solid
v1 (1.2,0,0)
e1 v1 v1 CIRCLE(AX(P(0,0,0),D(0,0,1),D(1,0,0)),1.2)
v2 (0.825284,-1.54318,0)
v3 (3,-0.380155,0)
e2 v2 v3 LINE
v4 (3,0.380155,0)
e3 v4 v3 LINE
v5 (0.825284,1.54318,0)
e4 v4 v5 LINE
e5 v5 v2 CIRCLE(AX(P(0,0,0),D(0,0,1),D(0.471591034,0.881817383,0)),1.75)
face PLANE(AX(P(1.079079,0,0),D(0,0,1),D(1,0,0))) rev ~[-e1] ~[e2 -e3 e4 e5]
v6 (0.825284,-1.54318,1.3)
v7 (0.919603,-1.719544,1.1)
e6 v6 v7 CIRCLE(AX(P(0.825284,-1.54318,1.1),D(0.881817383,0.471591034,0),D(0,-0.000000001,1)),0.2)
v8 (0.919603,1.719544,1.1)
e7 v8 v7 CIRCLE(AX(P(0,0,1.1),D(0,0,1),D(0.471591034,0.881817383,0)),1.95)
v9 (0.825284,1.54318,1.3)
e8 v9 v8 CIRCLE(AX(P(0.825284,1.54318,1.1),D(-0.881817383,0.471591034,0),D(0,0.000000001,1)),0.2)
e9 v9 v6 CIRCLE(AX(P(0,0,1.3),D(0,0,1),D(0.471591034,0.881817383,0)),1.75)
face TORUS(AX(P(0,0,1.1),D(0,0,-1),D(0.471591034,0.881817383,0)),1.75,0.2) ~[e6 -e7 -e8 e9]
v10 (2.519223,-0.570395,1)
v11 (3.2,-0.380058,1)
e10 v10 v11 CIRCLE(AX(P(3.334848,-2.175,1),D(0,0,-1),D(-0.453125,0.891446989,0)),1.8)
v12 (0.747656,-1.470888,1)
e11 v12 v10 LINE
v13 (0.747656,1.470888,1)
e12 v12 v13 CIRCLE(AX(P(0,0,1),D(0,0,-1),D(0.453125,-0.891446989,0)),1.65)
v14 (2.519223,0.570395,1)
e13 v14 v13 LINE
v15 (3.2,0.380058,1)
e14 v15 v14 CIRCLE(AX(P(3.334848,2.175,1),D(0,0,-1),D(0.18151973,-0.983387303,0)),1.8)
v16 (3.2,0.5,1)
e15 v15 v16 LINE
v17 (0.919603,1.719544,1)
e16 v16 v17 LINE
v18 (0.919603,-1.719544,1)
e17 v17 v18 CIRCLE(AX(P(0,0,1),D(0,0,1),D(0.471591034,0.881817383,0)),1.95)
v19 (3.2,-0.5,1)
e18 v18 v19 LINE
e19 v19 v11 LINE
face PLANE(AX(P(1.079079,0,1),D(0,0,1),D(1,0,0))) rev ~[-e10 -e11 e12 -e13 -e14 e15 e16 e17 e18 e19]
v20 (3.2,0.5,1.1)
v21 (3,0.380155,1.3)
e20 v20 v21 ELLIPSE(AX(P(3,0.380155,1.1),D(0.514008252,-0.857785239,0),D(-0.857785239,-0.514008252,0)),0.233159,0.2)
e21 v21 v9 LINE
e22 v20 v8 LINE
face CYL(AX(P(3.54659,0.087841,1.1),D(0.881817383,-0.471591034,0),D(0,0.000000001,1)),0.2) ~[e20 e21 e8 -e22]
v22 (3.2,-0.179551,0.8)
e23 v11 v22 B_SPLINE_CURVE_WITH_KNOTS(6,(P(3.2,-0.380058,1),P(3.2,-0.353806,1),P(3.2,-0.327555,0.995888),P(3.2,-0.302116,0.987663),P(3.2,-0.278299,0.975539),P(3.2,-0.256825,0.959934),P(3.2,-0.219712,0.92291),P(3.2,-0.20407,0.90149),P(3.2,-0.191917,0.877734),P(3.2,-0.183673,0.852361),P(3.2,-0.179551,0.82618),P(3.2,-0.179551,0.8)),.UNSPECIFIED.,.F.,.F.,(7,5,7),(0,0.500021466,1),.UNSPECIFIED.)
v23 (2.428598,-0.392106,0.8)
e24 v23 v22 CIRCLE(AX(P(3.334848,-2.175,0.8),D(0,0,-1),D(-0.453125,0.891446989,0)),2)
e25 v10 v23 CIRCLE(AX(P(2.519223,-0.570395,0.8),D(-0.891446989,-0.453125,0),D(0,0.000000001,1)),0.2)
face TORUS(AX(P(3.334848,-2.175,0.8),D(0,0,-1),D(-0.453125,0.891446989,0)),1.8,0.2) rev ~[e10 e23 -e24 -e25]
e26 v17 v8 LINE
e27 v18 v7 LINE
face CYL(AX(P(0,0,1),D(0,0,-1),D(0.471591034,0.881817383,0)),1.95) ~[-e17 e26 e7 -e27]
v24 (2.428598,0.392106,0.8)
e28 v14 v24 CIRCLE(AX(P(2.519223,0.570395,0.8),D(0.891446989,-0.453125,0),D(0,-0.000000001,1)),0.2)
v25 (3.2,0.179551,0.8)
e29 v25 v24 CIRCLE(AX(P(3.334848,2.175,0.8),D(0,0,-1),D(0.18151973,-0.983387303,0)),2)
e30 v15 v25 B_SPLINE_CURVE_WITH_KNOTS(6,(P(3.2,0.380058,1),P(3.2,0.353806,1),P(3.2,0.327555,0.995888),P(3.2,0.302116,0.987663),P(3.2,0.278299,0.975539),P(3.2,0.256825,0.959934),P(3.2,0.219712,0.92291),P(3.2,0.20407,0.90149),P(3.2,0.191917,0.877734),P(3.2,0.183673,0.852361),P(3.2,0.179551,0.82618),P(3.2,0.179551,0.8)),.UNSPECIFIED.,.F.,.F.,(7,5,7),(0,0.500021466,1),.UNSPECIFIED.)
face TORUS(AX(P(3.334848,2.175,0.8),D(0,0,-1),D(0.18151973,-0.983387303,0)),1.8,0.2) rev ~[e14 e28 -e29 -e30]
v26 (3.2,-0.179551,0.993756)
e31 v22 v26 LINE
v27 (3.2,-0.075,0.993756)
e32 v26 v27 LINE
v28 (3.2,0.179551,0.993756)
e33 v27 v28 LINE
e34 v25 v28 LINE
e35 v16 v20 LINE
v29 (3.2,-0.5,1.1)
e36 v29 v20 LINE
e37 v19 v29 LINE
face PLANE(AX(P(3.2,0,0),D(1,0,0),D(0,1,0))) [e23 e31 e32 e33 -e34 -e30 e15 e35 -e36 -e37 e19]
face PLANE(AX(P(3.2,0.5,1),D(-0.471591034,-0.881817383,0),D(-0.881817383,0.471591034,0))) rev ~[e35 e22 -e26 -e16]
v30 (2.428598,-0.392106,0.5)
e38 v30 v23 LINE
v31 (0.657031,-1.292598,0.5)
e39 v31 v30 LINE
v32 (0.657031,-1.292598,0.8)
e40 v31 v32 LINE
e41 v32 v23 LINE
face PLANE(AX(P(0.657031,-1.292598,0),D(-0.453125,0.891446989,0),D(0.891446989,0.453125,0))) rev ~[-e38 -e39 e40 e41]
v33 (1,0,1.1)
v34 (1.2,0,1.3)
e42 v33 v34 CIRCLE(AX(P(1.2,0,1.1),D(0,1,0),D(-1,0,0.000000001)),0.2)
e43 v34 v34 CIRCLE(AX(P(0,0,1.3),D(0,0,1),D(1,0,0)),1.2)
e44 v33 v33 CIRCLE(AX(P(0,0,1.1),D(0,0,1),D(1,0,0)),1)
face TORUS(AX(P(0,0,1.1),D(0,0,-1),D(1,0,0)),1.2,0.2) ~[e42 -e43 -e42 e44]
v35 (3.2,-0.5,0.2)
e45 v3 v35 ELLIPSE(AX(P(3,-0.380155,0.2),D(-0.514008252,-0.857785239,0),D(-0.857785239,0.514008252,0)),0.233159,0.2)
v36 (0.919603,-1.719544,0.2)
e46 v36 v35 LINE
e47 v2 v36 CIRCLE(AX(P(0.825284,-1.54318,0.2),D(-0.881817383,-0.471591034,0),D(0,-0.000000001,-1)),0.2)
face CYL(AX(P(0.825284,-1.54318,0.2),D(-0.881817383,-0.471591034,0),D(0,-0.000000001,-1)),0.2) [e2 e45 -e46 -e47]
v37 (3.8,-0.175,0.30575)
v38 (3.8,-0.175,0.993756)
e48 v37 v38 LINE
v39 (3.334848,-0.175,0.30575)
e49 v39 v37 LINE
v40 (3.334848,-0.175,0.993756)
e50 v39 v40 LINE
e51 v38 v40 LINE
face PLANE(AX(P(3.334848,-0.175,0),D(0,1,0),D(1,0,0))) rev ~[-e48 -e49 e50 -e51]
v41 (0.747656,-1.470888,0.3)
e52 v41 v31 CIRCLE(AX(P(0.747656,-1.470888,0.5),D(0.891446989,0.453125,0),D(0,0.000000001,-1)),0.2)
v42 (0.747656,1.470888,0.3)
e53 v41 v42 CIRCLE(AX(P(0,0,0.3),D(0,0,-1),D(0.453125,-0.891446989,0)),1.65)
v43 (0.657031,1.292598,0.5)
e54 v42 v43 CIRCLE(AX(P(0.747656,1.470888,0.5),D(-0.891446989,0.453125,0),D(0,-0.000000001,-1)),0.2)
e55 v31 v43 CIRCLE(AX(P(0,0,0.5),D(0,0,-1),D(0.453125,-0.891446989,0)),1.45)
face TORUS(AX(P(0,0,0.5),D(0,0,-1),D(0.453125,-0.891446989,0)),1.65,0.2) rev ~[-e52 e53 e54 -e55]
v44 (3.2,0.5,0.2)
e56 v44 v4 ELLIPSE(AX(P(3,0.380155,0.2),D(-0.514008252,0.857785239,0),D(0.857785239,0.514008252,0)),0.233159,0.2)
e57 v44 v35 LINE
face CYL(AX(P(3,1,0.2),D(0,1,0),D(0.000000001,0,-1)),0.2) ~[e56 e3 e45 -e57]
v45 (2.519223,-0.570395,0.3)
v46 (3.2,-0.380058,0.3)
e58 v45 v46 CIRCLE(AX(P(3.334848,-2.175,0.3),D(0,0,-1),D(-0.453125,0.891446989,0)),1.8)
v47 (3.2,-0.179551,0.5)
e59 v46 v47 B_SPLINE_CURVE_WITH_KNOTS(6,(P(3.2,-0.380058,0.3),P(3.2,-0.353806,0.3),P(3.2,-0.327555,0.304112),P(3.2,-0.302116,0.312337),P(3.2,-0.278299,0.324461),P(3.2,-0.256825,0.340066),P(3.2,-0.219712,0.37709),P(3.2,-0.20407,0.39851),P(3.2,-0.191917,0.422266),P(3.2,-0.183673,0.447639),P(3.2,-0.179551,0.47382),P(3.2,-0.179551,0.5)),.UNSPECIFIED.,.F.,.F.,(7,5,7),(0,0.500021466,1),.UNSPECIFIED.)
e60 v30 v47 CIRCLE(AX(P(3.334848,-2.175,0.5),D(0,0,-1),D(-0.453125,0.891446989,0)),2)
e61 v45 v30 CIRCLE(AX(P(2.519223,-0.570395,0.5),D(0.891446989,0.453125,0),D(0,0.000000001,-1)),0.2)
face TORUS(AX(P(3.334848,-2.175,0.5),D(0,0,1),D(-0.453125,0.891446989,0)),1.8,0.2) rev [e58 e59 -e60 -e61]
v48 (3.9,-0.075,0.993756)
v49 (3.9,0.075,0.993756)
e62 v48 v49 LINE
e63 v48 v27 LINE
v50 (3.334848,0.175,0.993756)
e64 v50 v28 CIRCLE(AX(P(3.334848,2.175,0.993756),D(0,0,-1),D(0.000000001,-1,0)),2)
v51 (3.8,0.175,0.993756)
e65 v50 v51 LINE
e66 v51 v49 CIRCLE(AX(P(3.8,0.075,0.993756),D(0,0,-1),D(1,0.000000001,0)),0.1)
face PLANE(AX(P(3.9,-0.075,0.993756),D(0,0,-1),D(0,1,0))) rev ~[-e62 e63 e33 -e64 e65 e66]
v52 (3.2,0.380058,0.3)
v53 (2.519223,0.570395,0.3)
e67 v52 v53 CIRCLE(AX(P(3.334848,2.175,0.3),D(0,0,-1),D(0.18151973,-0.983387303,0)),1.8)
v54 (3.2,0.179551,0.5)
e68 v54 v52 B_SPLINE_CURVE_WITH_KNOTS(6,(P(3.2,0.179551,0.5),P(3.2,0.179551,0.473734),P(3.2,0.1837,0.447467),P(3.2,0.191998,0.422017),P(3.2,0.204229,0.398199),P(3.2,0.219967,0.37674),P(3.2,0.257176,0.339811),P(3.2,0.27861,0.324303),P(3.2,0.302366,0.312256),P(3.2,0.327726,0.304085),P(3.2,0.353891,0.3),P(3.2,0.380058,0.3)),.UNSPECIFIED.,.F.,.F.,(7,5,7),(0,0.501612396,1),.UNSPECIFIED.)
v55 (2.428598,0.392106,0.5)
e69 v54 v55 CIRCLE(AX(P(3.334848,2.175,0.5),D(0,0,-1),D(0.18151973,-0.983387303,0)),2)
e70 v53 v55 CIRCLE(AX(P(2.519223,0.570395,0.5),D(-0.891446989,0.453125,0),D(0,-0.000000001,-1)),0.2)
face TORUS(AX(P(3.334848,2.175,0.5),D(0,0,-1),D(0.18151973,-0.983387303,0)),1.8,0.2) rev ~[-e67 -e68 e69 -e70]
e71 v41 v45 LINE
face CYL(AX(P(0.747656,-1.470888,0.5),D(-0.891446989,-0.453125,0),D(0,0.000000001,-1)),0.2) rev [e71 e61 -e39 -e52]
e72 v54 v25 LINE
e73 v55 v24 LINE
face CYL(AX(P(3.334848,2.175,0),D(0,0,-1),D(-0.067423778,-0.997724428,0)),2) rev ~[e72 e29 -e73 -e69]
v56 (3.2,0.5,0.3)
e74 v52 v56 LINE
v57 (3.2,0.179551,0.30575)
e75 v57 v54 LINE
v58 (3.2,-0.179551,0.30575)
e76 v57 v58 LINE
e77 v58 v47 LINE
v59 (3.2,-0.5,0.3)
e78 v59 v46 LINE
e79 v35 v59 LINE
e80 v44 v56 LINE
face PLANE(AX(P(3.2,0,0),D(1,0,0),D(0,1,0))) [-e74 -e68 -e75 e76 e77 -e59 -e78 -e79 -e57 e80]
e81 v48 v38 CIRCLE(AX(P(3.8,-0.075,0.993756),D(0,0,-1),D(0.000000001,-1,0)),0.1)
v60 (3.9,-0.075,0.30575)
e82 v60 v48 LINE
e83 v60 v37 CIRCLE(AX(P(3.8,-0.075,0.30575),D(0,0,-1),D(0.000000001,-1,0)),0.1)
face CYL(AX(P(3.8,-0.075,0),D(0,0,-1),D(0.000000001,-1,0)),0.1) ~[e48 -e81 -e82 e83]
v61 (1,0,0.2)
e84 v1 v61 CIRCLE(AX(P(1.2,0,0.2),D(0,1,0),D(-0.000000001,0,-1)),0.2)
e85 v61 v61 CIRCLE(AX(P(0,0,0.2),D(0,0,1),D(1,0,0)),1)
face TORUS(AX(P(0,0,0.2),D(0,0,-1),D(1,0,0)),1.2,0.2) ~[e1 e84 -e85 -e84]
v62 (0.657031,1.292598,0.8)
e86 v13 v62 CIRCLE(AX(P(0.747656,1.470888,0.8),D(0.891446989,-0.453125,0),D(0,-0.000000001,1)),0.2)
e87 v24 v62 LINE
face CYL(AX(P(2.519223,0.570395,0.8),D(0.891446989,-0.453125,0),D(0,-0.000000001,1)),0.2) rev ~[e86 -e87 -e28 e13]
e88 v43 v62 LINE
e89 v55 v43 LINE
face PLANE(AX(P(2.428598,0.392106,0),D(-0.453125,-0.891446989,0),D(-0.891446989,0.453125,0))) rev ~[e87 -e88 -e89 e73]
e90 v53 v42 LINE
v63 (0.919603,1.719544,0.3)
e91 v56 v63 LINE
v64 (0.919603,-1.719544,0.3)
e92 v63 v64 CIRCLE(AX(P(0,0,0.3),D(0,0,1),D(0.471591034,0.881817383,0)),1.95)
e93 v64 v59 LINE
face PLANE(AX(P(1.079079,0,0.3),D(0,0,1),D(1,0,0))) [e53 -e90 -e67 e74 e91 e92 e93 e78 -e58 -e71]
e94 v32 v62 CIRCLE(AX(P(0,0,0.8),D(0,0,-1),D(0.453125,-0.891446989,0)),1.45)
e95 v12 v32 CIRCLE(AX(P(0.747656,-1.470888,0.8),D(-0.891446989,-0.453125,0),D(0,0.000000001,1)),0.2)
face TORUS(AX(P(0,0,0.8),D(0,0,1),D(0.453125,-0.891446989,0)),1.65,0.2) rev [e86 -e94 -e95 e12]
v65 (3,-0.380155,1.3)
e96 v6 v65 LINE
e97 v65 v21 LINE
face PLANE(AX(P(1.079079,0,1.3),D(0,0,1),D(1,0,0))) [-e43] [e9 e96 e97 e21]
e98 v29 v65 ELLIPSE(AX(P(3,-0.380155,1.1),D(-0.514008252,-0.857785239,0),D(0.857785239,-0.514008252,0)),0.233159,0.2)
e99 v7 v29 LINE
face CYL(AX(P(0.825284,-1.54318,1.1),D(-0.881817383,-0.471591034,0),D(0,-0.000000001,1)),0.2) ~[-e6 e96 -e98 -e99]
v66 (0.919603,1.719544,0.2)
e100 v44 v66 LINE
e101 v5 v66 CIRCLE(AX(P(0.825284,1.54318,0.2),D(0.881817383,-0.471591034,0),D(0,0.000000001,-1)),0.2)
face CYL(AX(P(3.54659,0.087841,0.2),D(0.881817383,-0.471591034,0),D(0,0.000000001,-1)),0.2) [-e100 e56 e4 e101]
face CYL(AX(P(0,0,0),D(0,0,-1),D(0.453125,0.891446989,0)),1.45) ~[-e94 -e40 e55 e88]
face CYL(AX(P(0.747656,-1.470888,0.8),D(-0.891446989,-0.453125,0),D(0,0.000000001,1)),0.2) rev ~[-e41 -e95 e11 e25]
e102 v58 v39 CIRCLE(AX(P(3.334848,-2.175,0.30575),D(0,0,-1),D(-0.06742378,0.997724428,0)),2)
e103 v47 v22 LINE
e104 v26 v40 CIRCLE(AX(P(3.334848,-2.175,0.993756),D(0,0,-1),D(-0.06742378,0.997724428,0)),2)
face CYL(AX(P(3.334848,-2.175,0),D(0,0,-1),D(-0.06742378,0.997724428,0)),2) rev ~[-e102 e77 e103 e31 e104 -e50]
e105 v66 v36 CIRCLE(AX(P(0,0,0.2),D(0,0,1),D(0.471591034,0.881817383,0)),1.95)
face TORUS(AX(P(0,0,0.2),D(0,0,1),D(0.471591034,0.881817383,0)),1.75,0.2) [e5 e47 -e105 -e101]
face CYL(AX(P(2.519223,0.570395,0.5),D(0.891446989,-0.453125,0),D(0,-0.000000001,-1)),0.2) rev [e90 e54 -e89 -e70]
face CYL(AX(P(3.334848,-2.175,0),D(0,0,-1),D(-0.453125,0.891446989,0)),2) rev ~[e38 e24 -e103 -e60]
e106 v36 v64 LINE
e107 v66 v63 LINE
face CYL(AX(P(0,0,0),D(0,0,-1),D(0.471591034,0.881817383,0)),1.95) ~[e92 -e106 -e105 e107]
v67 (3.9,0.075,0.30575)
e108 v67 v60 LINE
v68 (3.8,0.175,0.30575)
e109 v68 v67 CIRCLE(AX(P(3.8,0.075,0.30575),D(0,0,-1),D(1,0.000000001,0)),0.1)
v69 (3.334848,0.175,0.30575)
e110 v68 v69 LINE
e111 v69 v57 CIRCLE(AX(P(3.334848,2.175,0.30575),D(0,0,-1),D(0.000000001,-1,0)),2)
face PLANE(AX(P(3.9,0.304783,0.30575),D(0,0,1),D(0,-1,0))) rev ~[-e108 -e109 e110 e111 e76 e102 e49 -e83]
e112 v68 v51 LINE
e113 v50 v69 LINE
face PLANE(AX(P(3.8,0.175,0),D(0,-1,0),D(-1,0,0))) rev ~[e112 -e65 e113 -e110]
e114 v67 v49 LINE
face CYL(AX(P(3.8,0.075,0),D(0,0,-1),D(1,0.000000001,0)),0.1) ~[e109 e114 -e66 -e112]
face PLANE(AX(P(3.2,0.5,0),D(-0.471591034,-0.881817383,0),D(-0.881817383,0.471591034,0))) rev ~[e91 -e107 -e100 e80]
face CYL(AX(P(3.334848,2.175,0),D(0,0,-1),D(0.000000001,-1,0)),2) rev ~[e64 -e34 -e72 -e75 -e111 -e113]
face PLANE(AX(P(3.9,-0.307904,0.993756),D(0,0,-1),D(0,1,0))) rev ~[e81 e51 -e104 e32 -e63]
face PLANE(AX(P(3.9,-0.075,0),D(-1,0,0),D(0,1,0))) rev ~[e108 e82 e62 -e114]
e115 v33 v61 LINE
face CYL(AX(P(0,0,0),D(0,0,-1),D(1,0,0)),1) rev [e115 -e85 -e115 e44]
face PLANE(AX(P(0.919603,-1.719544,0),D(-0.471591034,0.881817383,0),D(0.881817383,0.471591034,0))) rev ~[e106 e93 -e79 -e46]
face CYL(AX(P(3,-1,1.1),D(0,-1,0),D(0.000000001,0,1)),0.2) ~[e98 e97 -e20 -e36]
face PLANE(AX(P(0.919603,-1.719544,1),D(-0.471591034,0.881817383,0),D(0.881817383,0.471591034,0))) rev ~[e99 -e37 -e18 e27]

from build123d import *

# Parameters (mm, degrees)
F0_R          = 1
F1_DEPTH      = 1.3
F2_DEPTH      = 0.3
F3_START      = 1
F3_DEPTH      = 0.3
F4_W          = 0.15
F4_H          = 0.3062440047
F4_W_2        = 0.2115944407
F4_W_3        = 0.2297833452
F4_H_2        = 0.3057500289
F4_W_4        = 0.2163899079
F5_DEPTH      = 0.7
F6_T1_DEPTH   = 1.9872929377
F6_T3_DEPTH   = 1.9872929377
F6_T6_ANGLE   = 233.888716361
F6_T10_ANGLE  = 37.4026504782
F6_T15_ANGLE  = 37.4026504782
F6_T18_ANGLE  = 233.888716361
F6_T22_ANGLE  = 37.4026504782
F6_T27_ANGLE  = 37.4026504782
F6_T32_DEPTH  = 2
F6_T38_DEPTH  = 3.0860201082
F6_T41_ANGLE  = 236.2752472868
F6_T45_DEPTH  = 3.0860201082
F6_T52_DEPTH  = 3.0860201082
F6_T57_DEPTH  = 2
F6_T63_DEPTH  = 3.0860201082
F6_T66_ANGLE  = 236.2752472868
F6_T73_DEPTH  = 2
F6_T77_DEPTH  = 3.0860201082
F6_T84_DEPTH  = 2
F6_T88_DEPTH  = 3.0860201082
F6_T95_DEPTH  = 3.0860201082
F6_T99_DEPTH  = 2
F6_T106_DEPTH = 2
F6_T110_DEPTH = 3.0860201082


# Not quite as in the source:
# - a fillet or chamfer that OpenCascade refuses, or shapes differently, is made with other operations: its cross-section is extruded or revolved along the edge and cut away or added


with BuildPart() as f1:
    # F0 (on Top) → F1 (new body)
    with BuildSketch(Plane.XY):
        with BuildLine():
            ThreePointArc((2.4285975558, -0.3921060218), (2.8035605108, -0.2468573508), (3.2, -0.1795511441))
            ThreePointArc((3.2, -0.1795511441), (3.2673853882, -0.1761381098), (3.3348475558, -0.175))
            Line((3.3348475558, -0.175), (3.8, -0.175))
            ThreePointArc((3.8, -0.175), (3.8707106781, -0.1457106781), (3.9, -0.075))
            Line((3.9, -0.075), (3.9, 0))
            Line((3.9, 0), (3.9, 0.075))
            ThreePointArc((3.9, 0.075), (3.8707106781, 0.1457106781), (3.8, 0.175))
            Line((3.8, 0.175), (3.3348475558, 0.175))
            ThreePointArc((3.3348475558, 0.175), (3.2673853882, 0.1761381098), (3.2, 0.1795511441))
            ThreePointArc((3.2, 0.1795511441), (2.8035605108, 0.2468573508), (2.4285975558, 0.3921060218))
            Line((2.4285975558, 0.3921060218), (0.65703125, 1.2925981342))
            ThreePointArc((0.65703125, 1.2925981342), (-1.45, 0), (0.65703125, -1.2925981342))
            Line((0.65703125, -1.2925981342), (2.4285975558, -0.3921060218))
        make_face()
        Circle(F0_R, mode=Mode.SUBTRACT)
    extrude(amount=F1_DEPTH)

    # F0 (on Top) → F2 (join)
    with BuildSketch(Plane.XY):
        with BuildLine():
            ThreePointArc((2.4285975558, -0.3921060218), (2.8035605108, -0.2468573508), (3.2, -0.1795511441))
            ThreePointArc((3.2, -0.1795511441), (3.2673853882, -0.1761381098), (3.3348475558, -0.175))
            Line((3.3348475558, -0.175), (3.8, -0.175))
            ThreePointArc((3.8, -0.175), (3.8707106781, -0.1457106781), (3.9, -0.075))
            Line((3.9, -0.075), (3.9, 0))
            Line((3.9, 0), (3.9, 0.075))
            ThreePointArc((3.9, 0.075), (3.8707106781, 0.1457106781), (3.8, 0.175))
            Line((3.8, 0.175), (3.3348475558, 0.175))
            ThreePointArc((3.3348475558, 0.175), (3.2673853882, 0.1761381098), (3.2, 0.1795511441))
            ThreePointArc((3.2, 0.1795511441), (2.8035605108, 0.2468573508), (2.4285975558, 0.3921060218))
            Line((2.4285975558, 0.3921060218), (0.65703125, 1.2925981342))
            ThreePointArc((0.65703125, 1.2925981342), (-1.45, 0), (0.65703125, -1.2925981342))
            Line((0.65703125, -1.2925981342), (2.4285975558, -0.3921060218))
        make_face()
        Circle(F0_R, mode=Mode.SUBTRACT)
        with BuildLine():
            Line((3.2, -0.5), (3.2, -0.1795511441))
            ThreePointArc((3.2, -0.1795511441), (2.8035605108, -0.2468573508), (2.4285975558, -0.3921060218))
            Line((2.4285975558, -0.3921060218), (0.65703125, -1.2925981342))
            ThreePointArc((0.65703125, -1.2925981342), (-1.45, 0), (0.65703125, 1.2925981342))
            Line((0.65703125, 1.2925981342), (2.4285975558, 0.3921060218))
            ThreePointArc((2.4285975558, 0.3921060218), (2.8035605108, 0.2468573508), (3.2, 0.1795511441))
            Line((3.2, 0.1795511441), (3.2, 0.5))
            Line((3.2, 0.5), (0.9196025162, 1.7195438966))
            ThreePointArc((0.9196025162, 1.7195438966), (-1.95, 0), (0.9196025162, -1.7195438966))
            Line((0.9196025162, -1.7195438966), (3.2, -0.5))
        make_face()
    extrude(amount=F2_DEPTH)

    # F0 (on Top) → F3 (join)
    with BuildSketch(Plane.XY.offset(F3_START)):
        with BuildLine():
            ThreePointArc((2.4285975558, -0.3921060218), (2.8035605108, -0.2468573508), (3.2, -0.1795511441))
            ThreePointArc((3.2, -0.1795511441), (3.2673853882, -0.1761381098), (3.3348475558, -0.175))
            Line((3.3348475558, -0.175), (3.8, -0.175))
            ThreePointArc((3.8, -0.175), (3.8707106781, -0.1457106781), (3.9, -0.075))
            Line((3.9, -0.075), (3.9, 0))
            Line((3.9, 0), (3.9, 0.075))
            ThreePointArc((3.9, 0.075), (3.8707106781, 0.1457106781), (3.8, 0.175))
            Line((3.8, 0.175), (3.3348475558, 0.175))
            ThreePointArc((3.3348475558, 0.175), (3.2673853882, 0.1761381098), (3.2, 0.1795511441))
            ThreePointArc((3.2, 0.1795511441), (2.8035605108, 0.2468573508), (2.4285975558, 0.3921060218))
            Line((2.4285975558, 0.3921060218), (0.65703125, 1.2925981342))
            ThreePointArc((0.65703125, 1.2925981342), (-1.45, 0), (0.65703125, -1.2925981342))
            Line((0.65703125, -1.2925981342), (2.4285975558, -0.3921060218))
        make_face()
        Circle(F0_R, mode=Mode.SUBTRACT)
        with BuildLine():
            Line((3.2, -0.5), (3.2, -0.1795511441))
            ThreePointArc((3.2, -0.1795511441), (2.8035605108, -0.2468573508), (2.4285975558, -0.3921060218))
            Line((2.4285975558, -0.3921060218), (0.65703125, -1.2925981342))
            ThreePointArc((0.65703125, -1.2925981342), (-1.45, 0), (0.65703125, 1.2925981342))
            Line((0.65703125, 1.2925981342), (2.4285975558, 0.3921060218))
            ThreePointArc((2.4285975558, 0.3921060218), (2.8035605108, 0.2468573508), (3.2, 0.1795511441))
            Line((3.2, 0.1795511441), (3.2, 0.5))
            Line((3.2, 0.5), (0.9196025162, 1.7195438966))
            ThreePointArc((0.9196025162, 1.7195438966), (-1.95, 0), (0.9196025162, -1.7195438966))
            Line((0.9196025162, -1.7195438966), (3.2, -0.5))
        make_face()
    extrude(amount=F3_DEPTH)

    # F4 (on face) → F5 (cut)
    with BuildSketch(Plane.YZ.offset(3.9)):
        Polygon((-0.075, 1.3), (-0.2913899079, 1.3), (-0.3079036542, 0.9937559953), (-0.075, 0.9937559953), align=None)
        with Locations((0, 1.1468779976)):
            Rectangle(F4_W, F4_H)
        with Locations((0.1807972203, 1.1468779976)):
            Rectangle(F4_W_2, F4_H)
        with Locations((0.1898916726, 0.1528750145)):
            Rectangle(F4_W_3, F4_H_2)
        with Locations((0, 0.1528750145)):
            Rectangle(F4_W, F4_H_2)
        with Locations((-0.183194954, 0.1528750145)):
            Rectangle(F4_W_4, F4_H_2)
    extrude(amount=-F5_DEPTH, mode=Mode.SUBTRACT)

    # F6: fillet of radius 0.2 on 14 edges, made by hand

    # F6_s2 → F6_t1 (join)
    with BuildSketch(Plane(origin=(0, 0, 0), x_dir=(0, 0, 1), z_dir=(0.8914469891, 0.453125, 0))):
        with BuildLine():
            ThreePointArc((0.3, 1.65), (0.3585786438, 1.5085786438), (0.5, 1.45))
            Line((0.5, 1.45), (0.5, 1.446))
            Line((0.5, 1.446), (0.296, 1.446))
            Line((0.296, 1.446), (0.296, 1.65))
            Line((0.296, 1.65), (0.3, 1.65))
        make_face()
        with BuildLine():
            ThreePointArc((1, 1.65), (0.9414213562, 1.5085786438), (0.8, 1.45))
            Line((0.8, 1.45), (0.8, 1.446))
            Line((0.8, 1.446), (1.004, 1.446))
            Line((1.004, 1.446), (1.004, 1.65))
            Line((1.004, 1.65), (1, 1.65))
        make_face()
    extrude(amount=F6_T1_DEPTH)

    # F6_s4 → F6_t3 (join)
    with BuildSketch(Plane(origin=(1.7715663058, -0.9004921124, 0), x_dir=(0, 0, 1), z_dir=(-0.8914469891, 0.453125, 0))):
        with BuildLine():
            ThreePointArc((1, 1.65), (0.9414213562, 1.5085786438), (0.8, 1.45))
            Line((0.8, 1.45), (0.8, 1.446))
            Line((0.8, 1.446), (1.004, 1.446))
            Line((1.004, 1.446), (1.004, 1.65))
            Line((1.004, 1.65), (1, 1.65))
        make_face()
        with BuildLine():
            ThreePointArc((0.3, 1.65), (0.3585786438, 1.5085786438), (0.5, 1.45))
            Line((0.5, 1.45), (0.5, 1.446))
            Line((0.5, 1.446), (0.296, 1.446))
            Line((0.296, 1.446), (0.296, 1.65))
            Line((0.296, 1.65), (0.3, 1.65))
        make_face()
    extrude(amount=F6_T3_DEPTH)

    # F6_s5 → F6_t6 (revolve)
    with BuildSketch(Plane(origin=(0, 0, 0), x_dir=(0, 0, 1), z_dir=(0.8914469891, 0.453125, 0))):
        with BuildLine():
            ThreePointArc((1, 1.65), (0.9414213562, 1.5085786438), (0.8, 1.45))
            Line((0.8, 1.45), (0.8, 1.446))
            Line((0.8, 1.446), (1.004, 1.446))
            Line((1.004, 1.446), (1.004, 1.65))
            Line((1.004, 1.65), (1, 1.65))
        make_face()
    revolve(axis=Axis((0, 0, 1), (0, 0, -1)), revolution_arc=F6_T6_ANGLE)


with BuildPart() as f6_tool8:
    # F6_s9 → F6_t10 (revolve)
    with BuildSketch(Plane(origin=(1.7715663058, 0.9004921124, 0), x_dir=(0, 0, 1), z_dir=(-0.8914469891, -0.453125, 0))):
        with BuildLine():
            ThreePointArc((1, -1.65), (0.9414213562, -1.5085786438), (0.8, -1.45))
            Line((0.8, -1.45), (0.8, -1.446))
            Line((0.8, -1.446), (1.004, -1.446))
            Line((1.004, -1.446), (1.004, -1.65))
            Line((1.004, -1.65), (1, -1.65))
        make_face()
    revolve(axis=Axis((3.3348475558, -2.175, 1), (0, 0, -1)), revolution_arc=F6_T10_ANGLE)

    split(bisect_by=Plane.YZ.offset(3.2), keep=Keep.BOTTOM)


with BuildPart() as f1_1:
    add(f1.part)

    # F6_t7: union F6_tool8
    add(f6_tool8.part)


with BuildPart() as f6_tool13:
    # F6_s14 → F6_t15 (revolve)
    with BuildSketch(Plane(origin=(3.6132129184, 0.666949259, 0), x_dir=(0, 0, 1), z_dir=(0.983387303, 0.1815197299, 0))):
        with BuildLine():
            ThreePointArc((1, 0.2664732437), (0.9414213562, 0.4078945999), (0.8, 0.4664732437))
            Line((0.8, 0.4664732437), (0.8, 0.4704732437))
            Line((0.8, 0.4704732437), (1.004, 0.4704732437))
            Line((1.004, 0.4704732437), (1.004, 0.2664732437))
            Line((1.004, 0.2664732437), (1, 0.2664732437))
        make_face()
    revolve(axis=Axis((3.3348475558, 2.175, 1), (0, 0, -1)), revolution_arc=F6_T15_ANGLE)

    split(bisect_by=Plane.YZ.offset(3.2), keep=Keep.BOTTOM)


with BuildPart() as f1_2:
    add(f1_1.part)

    # F6_t12: union F6_tool13
    add(f6_tool13.part)

    # F6_s17 → F6_t18 (revolve)
    with BuildSketch(Plane(origin=(0, 0, 0), x_dir=(0, 0, 1), z_dir=(0.8914469891, 0.453125, 0))):
        with BuildLine():
            ThreePointArc((0.3, 1.65), (0.3585786438, 1.5085786438), (0.5, 1.45))
            Line((0.5, 1.45), (0.5, 1.446))
            Line((0.5, 1.446), (0.296, 1.446))
            Line((0.296, 1.446), (0.296, 1.65))
            Line((0.296, 1.65), (0.3, 1.65))
        make_face()
    revolve(axis=Axis((0, 0, 0.3), (0, 0, -1)), revolution_arc=F6_T18_ANGLE)


with BuildPart() as f6_tool20:
    # F6_s21 → F6_t22 (revolve)
    with BuildSketch(Plane(origin=(1.7715663058, 0.9004921124, 0), x_dir=(0, 0, 1), z_dir=(-0.8914469891, -0.453125, 0))):
        with BuildLine():
            ThreePointArc((0.3, -1.65), (0.3585786438, -1.5085786438), (0.5, -1.45))
            Line((0.5, -1.45), (0.5, -1.446))
            Line((0.5, -1.446), (0.296, -1.446))
            Line((0.296, -1.446), (0.296, -1.65))
            Line((0.296, -1.65), (0.3, -1.65))
        make_face()
    revolve(axis=Axis((3.3348475558, -2.175, 0.3), (0, 0, -1)), revolution_arc=F6_T22_ANGLE)

    split(bisect_by=Plane.YZ.offset(3.2), keep=Keep.BOTTOM)


with BuildPart() as f1_3:
    add(f1_2.part)

    # F6_t19: union F6_tool20
    add(f6_tool20.part)


with BuildPart() as f6_tool25:
    # F6_s26 → F6_t27 (revolve)
    with BuildSketch(Plane(origin=(3.6132129184, 0.666949259, 0), x_dir=(0, 0, 1), z_dir=(0.983387303, 0.1815197299, 0))):
        with BuildLine():
            ThreePointArc((0.5, 0.4664732437), (0.3585786438, 0.4078945999), (0.3, 0.2664732437))
            Line((0.3, 0.2664732437), (0.296, 0.2664732437))
            Line((0.296, 0.2664732437), (0.296, 0.4704732437))
            Line((0.296, 0.4704732437), (0.5, 0.4704732437))
            Line((0.5, 0.4704732437), (0.5, 0.4664732437))
        make_face()
    revolve(axis=Axis((3.3348475558, 2.175, 0.3), (0, 0, -1)), revolution_arc=F6_T27_ANGLE)

    split(bisect_by=Plane.YZ.offset(3.2), keep=Keep.BOTTOM)


with BuildPart() as f1_4:
    add(f1_3.part)

    # F6_t24: union F6_tool25
    add(f6_tool25.part)


with BuildPart() as f6_tool30:
    # F6_s31 → F6_t32 (new body)
    with BuildSketch(Plane.XZ.offset(1)):
        with BuildLine():
            ThreePointArc((3, 1.3), (3.1414213562, 1.2414213562), (3.2, 1.1))
            Line((3.2, 1.1), (3.204, 1.1))
            Line((3.204, 1.1), (3.204, 1.304))
            Line((3.204, 1.304), (3, 1.304))
            Line((3, 1.304), (3, 1.3))
        make_face()
    extrude(amount=-F6_T32_DEPTH)

    split(bisect_by=Plane(origin=(0.9196025162, -1.7195438966, 0), x_dir=(0, 0, 1), z_dir=(-0.4715910339, 0.8818173829, 0)), keep=Keep.TOP)

    split(bisect_by=Plane(origin=(0.9196025162, 1.7195438966, 0), x_dir=(0, 0, 1), z_dir=(-0.4715910339, -0.8818173829, 0)), keep=Keep.TOP)


with BuildPart() as f1_5:
    add(f1_4.part)

    # F6_t29: cut F6_tool30
    add(f6_tool30.part, mode=Mode.SUBTRACT)


with BuildPart() as f6_tool36:
    # F6_s37 → F6_t38 (new body)
    with BuildSketch(Plane(origin=(2.7213061753, -1.4553394135, 0), x_dir=(0, 0, 1), z_dir=(-0.8818173829, 0.4715910339, 0))):
        with BuildLine():
            ThreePointArc((1.3, 1.75), (1.2414213562, 1.8914213562), (1.1, 1.95))
            Line((1.1, 1.95), (1.1, 1.954))
            Line((1.1, 1.954), (1.304, 1.954))
            Line((1.304, 1.954), (1.304, 1.75))
            Line((1.304, 1.75), (1.3, 1.75))
        make_face()
    extrude(amount=F6_T38_DEPTH)

    split(bisect_by=Plane.YZ.offset(3.2), keep=Keep.BOTTOM)


with BuildPart() as f1_6:
    add(f1_5.part)

    # F6_t35: cut F6_tool36
    add(f6_tool36.part, mode=Mode.SUBTRACT)

    # F6_s40 → F6_t41 (revolve, cut)
    with BuildSketch(Plane(origin=(0, 0, 0), x_dir=(0, 0, 1), z_dir=(0.8818173829, -0.4715910339, 0))):
        with BuildLine():
            ThreePointArc((1.3, -1.75), (1.2414213562, -1.8914213562), (1.1, -1.95))
            Line((1.1, -1.95), (1.1, -1.954))
            Line((1.1, -1.954), (1.304, -1.954))
            Line((1.304, -1.954), (1.304, -1.75))
            Line((1.304, -1.75), (1.3, -1.75))
        make_face()
    revolve(axis=Axis((0, 0, 1.3), (0, 0, 1)), revolution_arc=F6_T41_ANGLE, mode=Mode.SUBTRACT)


with BuildPart() as f6_tool43:
    # F6_s44 → F6_t45 (new body)
    with BuildSketch(Plane(origin=(0, 0, 0), x_dir=(0, 0, 1), z_dir=(0.8818173829, 0.4715910339, 0))):
        with BuildLine():
            ThreePointArc((1.3, 1.75), (1.2414213562, 1.8914213562), (1.1, 1.95))
            Line((1.1, 1.95), (1.1, 1.954))
            Line((1.1, 1.954), (1.304, 1.954))
            Line((1.304, 1.954), (1.304, 1.75))
            Line((1.304, 1.75), (1.3, 1.75))
        make_face()
    extrude(amount=F6_T45_DEPTH)

    split(bisect_by=Plane.YZ.offset(3.2), keep=Keep.BOTTOM)


with BuildPart() as f1_7:
    add(f1_6.part)

    # F6_t42: cut F6_tool43
    add(f6_tool43.part, mode=Mode.SUBTRACT)

    # F6_s47 → F6_t48 (revolve, cut)
    with BuildSketch(Plane.XZ):
        with BuildLine():
            ThreePointArc((1, 1.1), (1.0585786438, 1.2414213562), (1.2, 1.3))
            Line((1.2, 1.3), (1.2, 1.304))
            Line((1.2, 1.304), (0.996, 1.304))
            Line((0.996, 1.304), (0.996, 1.1))
            Line((0.996, 1.1), (1, 1.1))
        make_face()
    revolve(axis=Axis((0, 0, 1.3), (0, 0, 1)), mode=Mode.SUBTRACT)


with BuildPart() as f6_tool50:
    # F6_s51 → F6_t52 (new body)
    with BuildSketch(Plane(origin=(0, 0, 0), x_dir=(0, 0, 1), z_dir=(0.8818173829, 0.4715910339, 0))):
        with BuildLine():
            ThreePointArc((0, 1.75), (0.0585786438, 1.8914213562), (0.2, 1.95))
            Line((0.2, 1.95), (0.2, 1.954))
            Line((0.2, 1.954), (-0.004, 1.954))
            Line((-0.004, 1.954), (-0.004, 1.75))
            Line((-0.004, 1.75), (0, 1.75))
        make_face()
    extrude(amount=F6_T52_DEPTH)

    split(bisect_by=Plane.YZ.offset(3.2), keep=Keep.BOTTOM)


with BuildPart() as f1_8:
    add(f1_7.part)

    # F6_t49: cut F6_tool50
    add(f6_tool50.part, mode=Mode.SUBTRACT)


with BuildPart() as f6_tool55:
    # F6_s56 → F6_t57 (new body)
    with BuildSketch(Plane.XZ.offset(-1)):
        with BuildLine():
            ThreePointArc((3, 0), (3.1414213562, 0.0585786438), (3.2, 0.2))
            Line((3.2, 0.2), (3.204, 0.2))
            Line((3.204, 0.2), (3.204, -0.004))
            Line((3.204, -0.004), (3, -0.004))
            Line((3, -0.004), (3, 0))
        make_face()
    extrude(amount=F6_T57_DEPTH)

    split(bisect_by=Plane(origin=(0.9196025162, 1.7195438966, 0), x_dir=(0, 0, 1), z_dir=(-0.4715910339, -0.8818173829, 0)), keep=Keep.TOP)

    split(bisect_by=Plane(origin=(0.9196025162, -1.7195438966, 0), x_dir=(0, 0, 1), z_dir=(-0.4715910339, 0.8818173829, 0)), keep=Keep.TOP)


with BuildPart() as f1_9:
    add(f1_8.part)

    # F6_t54: cut F6_tool55
    add(f6_tool55.part, mode=Mode.SUBTRACT)


with BuildPart() as f6_tool61:
    # F6_s62 → F6_t63 (new body)
    with BuildSketch(Plane(origin=(2.7213061753, -1.4553394135, 0), x_dir=(0, 0, 1), z_dir=(-0.8818173829, 0.4715910339, 0))):
        with BuildLine():
            ThreePointArc((0, 1.75), (0.0585786438, 1.8914213562), (0.2, 1.95))
            Line((0.2, 1.95), (0.2, 1.954))
            Line((0.2, 1.954), (-0.004, 1.954))
            Line((-0.004, 1.954), (-0.004, 1.75))
            Line((-0.004, 1.75), (0, 1.75))
        make_face()
    extrude(amount=F6_T63_DEPTH)

    split(bisect_by=Plane.YZ.offset(3.2), keep=Keep.BOTTOM)


with BuildPart() as f1_10:
    add(f1_9.part)

    # F6_t60: cut F6_tool61
    add(f6_tool61.part, mode=Mode.SUBTRACT)

    # F6_s65 → F6_t66 (revolve, cut)
    with BuildSketch(Plane(origin=(0, 0, 0), x_dir=(0, 0, 1), z_dir=(0.8818173829, -0.4715910339, 0))):
        with BuildLine():
            ThreePointArc((0, -1.75), (0.0585786438, -1.8914213562), (0.2, -1.95))
            Line((0.2, -1.95), (0.2, -1.954))
            Line((0.2, -1.954), (-0.004, -1.954))
            Line((-0.004, -1.954), (-0.004, -1.75))
            Line((-0.004, -1.75), (0, -1.75))
        make_face()
    revolve(axis=Axis((0, 0, 0), (0, 0, 1)), revolution_arc=F6_T66_ANGLE, mode=Mode.SUBTRACT)

    # F6_s67 → F6_t68 (revolve, cut)
    with BuildSketch(Plane.XZ):
        with BuildLine():
            ThreePointArc((1.2, 0), (1.0585786438, 0.0585786438), (1, 0.2))
            Line((1, 0.2), (0.996, 0.2))
            Line((0.996, 0.2), (0.996, -0.004))
            Line((0.996, -0.004), (1.2, -0.004))
            Line((1.2, -0.004), (1.2, 0))
        make_face()
    revolve(axis=Axis((0, 0, 0), (0, 0, 1)), mode=Mode.SUBTRACT)


with BuildPart() as f6_tool71:
    # F6_s72 → F6_t73 (new body)
    with BuildSketch(Plane.XZ.offset(1)):
        with BuildLine():
            ThreePointArc((3, 1.3), (3.1414213562, 1.2414213562), (3.2, 1.1))
            Line((3.2, 1.1), (3.204, 1.1))
            Line((3.204, 1.1), (3.204, 1.304))
            Line((3.204, 1.304), (3, 1.304))
            Line((3, 1.304), (3, 1.3))
        make_face()
    extrude(amount=-F6_T73_DEPTH)

    split(bisect_by=Plane(origin=(0.9196025162, -1.7195438966, 0), x_dir=(0, 0, 1), z_dir=(0.4715910339, -0.8818173829, 0)), keep=Keep.TOP)


with BuildPart() as f6_tool75:
    # F6_s76 → F6_t77 (new body)
    with BuildSketch(Plane(origin=(0, 0, 0), x_dir=(0, 0, 1), z_dir=(0.8818173829, 0.4715910339, 0))):
        with BuildLine():
            ThreePointArc((1.3, 1.75), (1.2414213562, 1.8914213562), (1.1, 1.95))
            Line((1.1, 1.95), (1.1, 1.954))
            Line((1.1, 1.954), (1.304, 1.954))
            Line((1.304, 1.954), (1.304, 1.75))
            Line((1.304, 1.75), (1.3, 1.75))
        make_face()
    extrude(amount=F6_T77_DEPTH)

    split(bisect_by=Plane.YZ.offset(3.2), keep=Keep.TOP)


with BuildPart() as f6_tool71_1:
    add(f6_tool71.part)

    # F6_t79: intersect F6_tool75
    add(f6_tool75.part, mode=Mode.INTERSECT)


with BuildPart() as f1_11:
    add(f1_10.part)

    # F6_t69: cut F6_tool71
    add(f6_tool71_1.part, mode=Mode.SUBTRACT)


with BuildPart() as f6_tool82:
    # F6_s83 → F6_t84 (new body)
    with BuildSketch(Plane.XZ.offset(1)):
        with BuildLine():
            ThreePointArc((3, 1.3), (3.1414213562, 1.2414213562), (3.2, 1.1))
            Line((3.2, 1.1), (3.204, 1.1))
            Line((3.204, 1.1), (3.204, 1.304))
            Line((3.204, 1.304), (3, 1.304))
            Line((3, 1.304), (3, 1.3))
        make_face()
    extrude(amount=-F6_T84_DEPTH)

    split(bisect_by=Plane(origin=(0.9196025162, 1.7195438966, 0), x_dir=(0, 0, 1), z_dir=(0.4715910339, 0.8818173829, 0)), keep=Keep.TOP)


with BuildPart() as f6_tool86:
    # F6_s87 → F6_t88 (new body)
    with BuildSketch(Plane(origin=(2.7213061753, -1.4553394135, 0), x_dir=(0, 0, 1), z_dir=(-0.8818173829, 0.4715910339, 0))):
        with BuildLine():
            ThreePointArc((1.3, 1.75), (1.2414213562, 1.8914213562), (1.1, 1.95))
            Line((1.1, 1.95), (1.1, 1.954))
            Line((1.1, 1.954), (1.304, 1.954))
            Line((1.304, 1.954), (1.304, 1.75))
            Line((1.304, 1.75), (1.3, 1.75))
        make_face()
    extrude(amount=F6_T88_DEPTH)

    split(bisect_by=Plane.YZ.offset(3.2), keep=Keep.TOP)


with BuildPart() as f6_tool82_1:
    add(f6_tool82.part)

    # F6_t90: intersect F6_tool86
    add(f6_tool86.part, mode=Mode.INTERSECT)


with BuildPart() as f1_12:
    add(f1_11.part)

    # F6_t80: cut F6_tool82
    add(f6_tool82_1.part, mode=Mode.SUBTRACT)


with BuildPart() as f6_tool93:
    # F6_s94 → F6_t95 (new body)
    with BuildSketch(Plane(origin=(0, 0, 0), x_dir=(0, 0, 1), z_dir=(0.8818173829, 0.4715910339, 0))):
        with BuildLine():
            ThreePointArc((0, 1.75), (0.0585786438, 1.8914213562), (0.2, 1.95))
            Line((0.2, 1.95), (0.2, 1.954))
            Line((0.2, 1.954), (-0.004, 1.954))
            Line((-0.004, 1.954), (-0.004, 1.75))
            Line((-0.004, 1.75), (0, 1.75))
        make_face()
    extrude(amount=F6_T95_DEPTH)

    split(bisect_by=Plane.YZ.offset(3.2), keep=Keep.TOP)


with BuildPart() as f6_tool97:
    # F6_s98 → F6_t99 (new body)
    with BuildSketch(Plane.XZ.offset(-1)):
        with BuildLine():
            ThreePointArc((3, 0), (3.1414213562, 0.0585786438), (3.2, 0.2))
            Line((3.2, 0.2), (3.204, 0.2))
            Line((3.204, 0.2), (3.204, -0.004))
            Line((3.204, -0.004), (3, -0.004))
            Line((3, -0.004), (3, 0))
        make_face()
    extrude(amount=F6_T99_DEPTH)

    split(bisect_by=Plane(origin=(0.9196025162, -1.7195438966, 0), x_dir=(0, 0, 1), z_dir=(0.4715910339, -0.8818173829, 0)), keep=Keep.TOP)


with BuildPart() as f6_tool93_1:
    add(f6_tool93.part)

    # F6_t101: intersect F6_tool97
    add(f6_tool97.part, mode=Mode.INTERSECT)


with BuildPart() as f1_13:
    add(f1_12.part)

    # F6_t91: cut F6_tool93
    add(f6_tool93_1.part, mode=Mode.SUBTRACT)


with BuildPart() as f6_tool104:
    # F6_s105 → F6_t106 (new body)
    with BuildSketch(Plane.XZ.offset(-1)):
        with BuildLine():
            ThreePointArc((3, 0), (3.1414213562, 0.0585786438), (3.2, 0.2))
            Line((3.2, 0.2), (3.204, 0.2))
            Line((3.204, 0.2), (3.204, -0.004))
            Line((3.204, -0.004), (3, -0.004))
            Line((3, -0.004), (3, 0))
        make_face()
    extrude(amount=F6_T106_DEPTH)

    split(bisect_by=Plane(origin=(0.9196025162, 1.7195438966, 0), x_dir=(0, 0, 1), z_dir=(0.4715910339, 0.8818173829, 0)), keep=Keep.TOP)


with BuildPart() as f6_tool108:
    # F6_s109 → F6_t110 (new body)
    with BuildSketch(Plane(origin=(2.7213061753, -1.4553394135, 0), x_dir=(0, 0, 1), z_dir=(-0.8818173829, 0.4715910339, 0))):
        with BuildLine():
            ThreePointArc((0, 1.75), (0.0585786438, 1.8914213562), (0.2, 1.95))
            Line((0.2, 1.95), (0.2, 1.954))
            Line((0.2, 1.954), (-0.004, 1.954))
            Line((-0.004, 1.954), (-0.004, 1.75))
            Line((-0.004, 1.75), (0, 1.75))
        make_face()
    extrude(amount=F6_T110_DEPTH)

    split(bisect_by=Plane.YZ.offset(3.2), keep=Keep.TOP)


with BuildPart() as f6_tool104_1:
    add(f6_tool104.part)

    # F6_t112: intersect F6_tool108
    add(f6_tool108.part, mode=Mode.INTERSECT)


with BuildPart() as f1_14:
    add(f1_13.part)

    # F6_t102: cut F6_tool104
    add(f6_tool104_1.part, mode=Mode.SUBTRACT)


solid = f1_14.part
